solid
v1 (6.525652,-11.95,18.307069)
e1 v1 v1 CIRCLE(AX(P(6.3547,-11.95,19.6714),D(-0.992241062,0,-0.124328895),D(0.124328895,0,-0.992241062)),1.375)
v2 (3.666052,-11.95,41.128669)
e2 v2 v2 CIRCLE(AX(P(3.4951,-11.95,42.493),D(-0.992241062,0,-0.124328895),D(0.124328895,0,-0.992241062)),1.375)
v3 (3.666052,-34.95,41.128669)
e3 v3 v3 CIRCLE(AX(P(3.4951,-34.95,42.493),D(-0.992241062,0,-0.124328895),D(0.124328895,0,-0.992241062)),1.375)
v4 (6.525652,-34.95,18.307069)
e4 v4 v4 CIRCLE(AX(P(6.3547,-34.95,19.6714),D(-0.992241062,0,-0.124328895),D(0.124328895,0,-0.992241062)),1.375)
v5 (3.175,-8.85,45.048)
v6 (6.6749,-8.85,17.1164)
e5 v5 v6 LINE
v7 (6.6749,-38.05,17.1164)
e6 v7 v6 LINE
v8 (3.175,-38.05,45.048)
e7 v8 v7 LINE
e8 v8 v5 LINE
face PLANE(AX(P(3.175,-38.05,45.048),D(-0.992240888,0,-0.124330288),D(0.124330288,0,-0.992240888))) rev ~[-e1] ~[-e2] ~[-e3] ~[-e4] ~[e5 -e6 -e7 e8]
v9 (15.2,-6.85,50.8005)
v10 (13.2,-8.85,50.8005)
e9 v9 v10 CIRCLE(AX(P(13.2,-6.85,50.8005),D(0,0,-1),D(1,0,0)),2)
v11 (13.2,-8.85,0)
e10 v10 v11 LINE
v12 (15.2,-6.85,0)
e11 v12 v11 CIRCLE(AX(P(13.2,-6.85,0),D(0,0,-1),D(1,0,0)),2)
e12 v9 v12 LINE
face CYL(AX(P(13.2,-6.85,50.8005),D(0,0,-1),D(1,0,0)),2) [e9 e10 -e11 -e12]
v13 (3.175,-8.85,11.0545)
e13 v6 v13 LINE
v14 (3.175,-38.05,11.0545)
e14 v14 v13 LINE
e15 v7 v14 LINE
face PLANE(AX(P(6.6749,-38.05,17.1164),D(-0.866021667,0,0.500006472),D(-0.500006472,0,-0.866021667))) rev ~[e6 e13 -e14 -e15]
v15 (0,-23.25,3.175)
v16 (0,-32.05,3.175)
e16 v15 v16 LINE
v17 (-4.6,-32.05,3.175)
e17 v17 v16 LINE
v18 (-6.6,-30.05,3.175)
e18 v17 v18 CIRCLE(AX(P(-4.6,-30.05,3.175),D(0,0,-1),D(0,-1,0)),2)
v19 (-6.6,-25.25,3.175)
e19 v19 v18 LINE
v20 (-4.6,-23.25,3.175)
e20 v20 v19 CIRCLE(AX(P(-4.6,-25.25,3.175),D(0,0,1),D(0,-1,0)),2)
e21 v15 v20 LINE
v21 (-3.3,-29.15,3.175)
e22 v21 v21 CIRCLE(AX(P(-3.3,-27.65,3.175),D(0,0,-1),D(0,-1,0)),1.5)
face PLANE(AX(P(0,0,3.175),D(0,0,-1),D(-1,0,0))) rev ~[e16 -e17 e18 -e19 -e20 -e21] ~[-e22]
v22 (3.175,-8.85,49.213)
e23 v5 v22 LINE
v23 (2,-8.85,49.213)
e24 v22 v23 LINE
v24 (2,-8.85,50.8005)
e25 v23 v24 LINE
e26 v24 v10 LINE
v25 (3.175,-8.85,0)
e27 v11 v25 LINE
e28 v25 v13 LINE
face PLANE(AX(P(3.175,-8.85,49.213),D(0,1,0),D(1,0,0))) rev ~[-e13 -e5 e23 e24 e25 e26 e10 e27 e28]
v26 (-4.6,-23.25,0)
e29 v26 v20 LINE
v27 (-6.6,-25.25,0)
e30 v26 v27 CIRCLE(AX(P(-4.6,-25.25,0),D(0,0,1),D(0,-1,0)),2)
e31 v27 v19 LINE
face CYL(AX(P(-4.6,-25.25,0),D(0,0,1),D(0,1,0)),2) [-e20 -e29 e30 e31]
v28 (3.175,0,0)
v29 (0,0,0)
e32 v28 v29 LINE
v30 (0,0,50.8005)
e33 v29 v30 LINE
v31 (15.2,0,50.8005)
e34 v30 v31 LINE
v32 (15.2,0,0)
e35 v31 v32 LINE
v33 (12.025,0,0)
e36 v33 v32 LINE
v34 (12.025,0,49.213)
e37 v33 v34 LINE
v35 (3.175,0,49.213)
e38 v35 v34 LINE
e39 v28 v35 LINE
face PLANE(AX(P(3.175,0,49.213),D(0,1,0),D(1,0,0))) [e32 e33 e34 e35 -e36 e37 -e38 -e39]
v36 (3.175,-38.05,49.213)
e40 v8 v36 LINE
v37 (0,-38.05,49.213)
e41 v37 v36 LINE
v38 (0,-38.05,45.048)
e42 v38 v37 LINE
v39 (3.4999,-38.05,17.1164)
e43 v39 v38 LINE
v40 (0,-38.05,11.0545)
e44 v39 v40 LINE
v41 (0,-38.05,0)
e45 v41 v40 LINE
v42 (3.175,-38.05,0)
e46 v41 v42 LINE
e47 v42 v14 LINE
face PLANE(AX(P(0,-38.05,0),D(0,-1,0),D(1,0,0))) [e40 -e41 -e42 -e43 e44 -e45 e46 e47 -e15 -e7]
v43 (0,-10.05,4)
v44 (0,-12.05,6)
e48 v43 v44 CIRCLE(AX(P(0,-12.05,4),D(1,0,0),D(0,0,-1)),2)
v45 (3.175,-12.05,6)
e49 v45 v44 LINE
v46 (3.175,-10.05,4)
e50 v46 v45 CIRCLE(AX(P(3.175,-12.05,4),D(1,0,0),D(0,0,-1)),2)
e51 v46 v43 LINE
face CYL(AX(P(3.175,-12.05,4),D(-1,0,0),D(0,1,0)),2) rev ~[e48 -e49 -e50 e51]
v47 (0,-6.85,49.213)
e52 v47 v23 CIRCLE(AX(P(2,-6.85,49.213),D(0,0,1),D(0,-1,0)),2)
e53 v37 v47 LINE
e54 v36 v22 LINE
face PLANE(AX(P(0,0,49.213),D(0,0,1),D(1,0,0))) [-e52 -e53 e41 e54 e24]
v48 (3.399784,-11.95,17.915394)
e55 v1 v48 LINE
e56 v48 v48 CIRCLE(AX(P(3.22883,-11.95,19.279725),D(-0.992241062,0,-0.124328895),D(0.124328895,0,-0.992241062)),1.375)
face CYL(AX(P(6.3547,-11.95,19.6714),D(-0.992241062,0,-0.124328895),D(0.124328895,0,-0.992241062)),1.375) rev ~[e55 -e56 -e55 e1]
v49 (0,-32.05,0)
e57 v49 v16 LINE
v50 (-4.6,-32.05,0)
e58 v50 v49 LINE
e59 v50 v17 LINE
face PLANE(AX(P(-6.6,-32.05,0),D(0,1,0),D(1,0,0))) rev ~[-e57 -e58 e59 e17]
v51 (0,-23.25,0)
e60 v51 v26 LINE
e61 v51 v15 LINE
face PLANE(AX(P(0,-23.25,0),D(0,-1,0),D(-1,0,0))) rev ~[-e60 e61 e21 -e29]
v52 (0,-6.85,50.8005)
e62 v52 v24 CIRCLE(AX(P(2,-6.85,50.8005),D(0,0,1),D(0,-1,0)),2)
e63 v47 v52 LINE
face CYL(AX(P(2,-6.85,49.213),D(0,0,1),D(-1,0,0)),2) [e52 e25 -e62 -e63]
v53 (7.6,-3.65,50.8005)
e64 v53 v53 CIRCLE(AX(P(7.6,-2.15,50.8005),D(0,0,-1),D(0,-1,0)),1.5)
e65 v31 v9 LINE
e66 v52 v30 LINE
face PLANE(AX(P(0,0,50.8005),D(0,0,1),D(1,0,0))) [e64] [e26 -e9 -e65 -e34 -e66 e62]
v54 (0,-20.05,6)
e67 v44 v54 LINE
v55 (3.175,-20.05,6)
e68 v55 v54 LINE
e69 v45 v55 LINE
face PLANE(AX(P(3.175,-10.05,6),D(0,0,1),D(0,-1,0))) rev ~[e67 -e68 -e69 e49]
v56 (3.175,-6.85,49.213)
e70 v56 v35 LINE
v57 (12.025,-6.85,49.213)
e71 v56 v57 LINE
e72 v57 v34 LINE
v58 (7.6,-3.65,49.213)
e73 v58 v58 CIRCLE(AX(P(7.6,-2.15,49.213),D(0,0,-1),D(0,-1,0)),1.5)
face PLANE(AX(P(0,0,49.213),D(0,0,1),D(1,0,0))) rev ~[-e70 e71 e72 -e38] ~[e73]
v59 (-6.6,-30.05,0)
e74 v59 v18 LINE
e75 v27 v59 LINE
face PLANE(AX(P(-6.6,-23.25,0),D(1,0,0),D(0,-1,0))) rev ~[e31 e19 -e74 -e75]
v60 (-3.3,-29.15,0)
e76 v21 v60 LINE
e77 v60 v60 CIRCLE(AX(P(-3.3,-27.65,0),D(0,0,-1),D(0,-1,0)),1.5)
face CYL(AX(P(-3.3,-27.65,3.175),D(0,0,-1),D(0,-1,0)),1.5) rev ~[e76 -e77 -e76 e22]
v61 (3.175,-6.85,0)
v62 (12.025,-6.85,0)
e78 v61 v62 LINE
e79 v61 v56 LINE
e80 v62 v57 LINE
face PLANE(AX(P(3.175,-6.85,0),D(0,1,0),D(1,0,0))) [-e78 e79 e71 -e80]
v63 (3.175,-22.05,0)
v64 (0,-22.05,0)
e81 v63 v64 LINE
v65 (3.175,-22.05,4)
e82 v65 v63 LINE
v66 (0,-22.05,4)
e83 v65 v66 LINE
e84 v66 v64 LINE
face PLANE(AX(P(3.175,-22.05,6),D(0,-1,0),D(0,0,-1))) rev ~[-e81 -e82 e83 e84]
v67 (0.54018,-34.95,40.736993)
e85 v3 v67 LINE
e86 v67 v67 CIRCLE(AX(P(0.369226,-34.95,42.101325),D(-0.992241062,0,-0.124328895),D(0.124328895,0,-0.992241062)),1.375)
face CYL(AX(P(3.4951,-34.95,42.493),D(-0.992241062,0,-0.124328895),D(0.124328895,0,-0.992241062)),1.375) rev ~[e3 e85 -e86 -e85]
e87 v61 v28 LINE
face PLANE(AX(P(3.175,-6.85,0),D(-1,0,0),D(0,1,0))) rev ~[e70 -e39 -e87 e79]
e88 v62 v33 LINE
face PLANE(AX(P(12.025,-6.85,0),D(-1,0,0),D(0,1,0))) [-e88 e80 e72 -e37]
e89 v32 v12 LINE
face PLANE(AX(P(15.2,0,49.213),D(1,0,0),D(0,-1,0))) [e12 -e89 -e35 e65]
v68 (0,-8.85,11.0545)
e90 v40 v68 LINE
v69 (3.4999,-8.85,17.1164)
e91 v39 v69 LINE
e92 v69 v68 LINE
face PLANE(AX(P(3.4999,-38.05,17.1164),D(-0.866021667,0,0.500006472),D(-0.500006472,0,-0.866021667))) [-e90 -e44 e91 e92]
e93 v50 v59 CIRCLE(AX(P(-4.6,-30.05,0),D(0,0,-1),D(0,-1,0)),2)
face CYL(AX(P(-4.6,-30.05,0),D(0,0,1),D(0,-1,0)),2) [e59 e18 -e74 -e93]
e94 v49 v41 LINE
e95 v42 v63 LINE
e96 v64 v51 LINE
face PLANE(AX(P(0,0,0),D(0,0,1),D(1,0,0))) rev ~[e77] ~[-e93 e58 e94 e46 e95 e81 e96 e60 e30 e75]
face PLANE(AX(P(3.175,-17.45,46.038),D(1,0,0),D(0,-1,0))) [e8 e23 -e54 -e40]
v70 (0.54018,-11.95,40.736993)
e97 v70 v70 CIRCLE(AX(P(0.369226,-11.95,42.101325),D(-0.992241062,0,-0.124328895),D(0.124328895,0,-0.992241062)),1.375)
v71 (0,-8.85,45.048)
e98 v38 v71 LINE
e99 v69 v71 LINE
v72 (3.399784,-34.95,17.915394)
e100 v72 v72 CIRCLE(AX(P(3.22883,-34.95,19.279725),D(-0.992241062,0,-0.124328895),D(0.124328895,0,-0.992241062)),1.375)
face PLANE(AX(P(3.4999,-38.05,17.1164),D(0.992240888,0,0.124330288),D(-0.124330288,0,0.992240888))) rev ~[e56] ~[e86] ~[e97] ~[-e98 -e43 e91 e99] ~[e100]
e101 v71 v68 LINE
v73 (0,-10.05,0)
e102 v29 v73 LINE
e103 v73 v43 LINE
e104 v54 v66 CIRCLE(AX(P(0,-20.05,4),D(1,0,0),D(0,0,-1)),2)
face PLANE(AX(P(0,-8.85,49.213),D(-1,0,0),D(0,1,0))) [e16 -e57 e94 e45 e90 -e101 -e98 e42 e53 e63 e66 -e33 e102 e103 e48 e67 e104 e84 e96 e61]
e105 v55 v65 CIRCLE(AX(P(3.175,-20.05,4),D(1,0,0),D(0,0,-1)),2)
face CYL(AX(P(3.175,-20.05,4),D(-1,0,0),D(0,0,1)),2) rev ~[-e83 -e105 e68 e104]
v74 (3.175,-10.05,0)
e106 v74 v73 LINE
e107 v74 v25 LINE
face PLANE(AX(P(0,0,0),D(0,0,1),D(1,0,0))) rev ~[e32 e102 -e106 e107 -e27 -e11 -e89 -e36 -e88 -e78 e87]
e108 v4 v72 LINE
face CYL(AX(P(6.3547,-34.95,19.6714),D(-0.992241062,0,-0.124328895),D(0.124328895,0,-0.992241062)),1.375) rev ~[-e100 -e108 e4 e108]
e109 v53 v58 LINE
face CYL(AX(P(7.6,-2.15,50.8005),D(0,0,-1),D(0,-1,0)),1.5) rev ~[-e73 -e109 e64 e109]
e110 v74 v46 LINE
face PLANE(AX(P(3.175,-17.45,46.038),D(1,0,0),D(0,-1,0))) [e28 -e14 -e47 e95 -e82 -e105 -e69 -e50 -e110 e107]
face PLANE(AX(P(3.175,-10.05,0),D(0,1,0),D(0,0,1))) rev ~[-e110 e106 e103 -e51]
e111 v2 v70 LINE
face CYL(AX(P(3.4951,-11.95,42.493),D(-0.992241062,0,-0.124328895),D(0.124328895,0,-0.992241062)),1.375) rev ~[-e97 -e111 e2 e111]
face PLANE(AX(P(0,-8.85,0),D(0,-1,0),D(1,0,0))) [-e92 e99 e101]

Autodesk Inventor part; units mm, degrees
ref_plane "YZ Plane" through (0, 0, 0) normal (1, 0, 0) x (0, 1, 0)
ref_plane "XZ Plane" through (0, 0, 0) normal (0, 1, 0) x (-1, 0, 0)
ref_plane "XY Plane" through (0, 0, 0) normal (0, 0, 1) x (1, 0, 0)
sketch "Sketch1" plane through (0, 0, 0) normal (0, 0, 1) x (1, 0, 0)
  line L0 (0, 0) -> (0, -38.05)
  line L1 (0, -38.05) -> (3.175, -38.05)
  line L2 (3.175, -38.05) -> (3.175, 0)
  line L3 (3.175, 0) -> (0, 0)
  line L4 (3.175, 0) -> (3.175, -6.85)
  line L5 (3.175, -6.85) -> (12.025, -6.85)
  line L6 (12.025, -6.85) -> (12.025, 0)
  line L7 (12.025, 0) -> (15.2, 0)
  line L8 (15.2, 0) -> (15.2, -6.85)
  line L9 (15.2, -6.85) -> (15.2, -8.85)
  line L10 (15.2, -8.85) -> (3.175, -8.85)
  line L11 (0, -38.05) -> (0, -31.2)
  dimension "d0" = 38.05
  dimension "d1" = 3.175
  dimension "d2" = 6.85
  dimension "d3" = 8.85
  dimension "d4" = 3.175
  dimension "d5" = 2
extrude "Extrusion1" add sketch "Sketch1" along normal blind 49.213
sketch "Sketch2" plane through (0, 0, 0) normal (0, 0, -1) x (-1, 0, 0)
  line L0 (0, -38.05) -> (-3.175, -38.05) projected
  line L1 (0, -38.05) -> (0, -32.05)
  line L2 (0, 0) -> (0, -38.05) projected
  line L3 (0, -32.05) -> (0, -23.25)
  line L4 (0, -23.25) -> (6.6, -23.25)
  line L5 (6.6, -23.25) -> (6.6, -32.05)
  line L6 (6.6, -32.05) -> (0, -32.05)
  dimension "d12" = 6
  dimension "d13" = 8.8
  dimension "d14" = 6.6
extrude "Extrusion2" add sketch "Sketch2" against normal blind 3.175
sketch "Sketch3" plane through (0, 0, 3.175) normal (0, 0, 1) x (1, 0, 0)
  line L0 (0, -23.25) -> (0, -32.05) projected
  line L1 (0, -23.25) -> (-3.3, -23.25)
  line L2 (0, -23.25) -> (-6.6, -23.25) projected
  line L3 (-3.3, -23.25) -> (-3.3, -27.65)
  point P0 (0, 0)
  dimension "d17" = 4.4
hole "Hole1" at (-3.3, -27.65, 3.175) direction (0, 0, -1) diameter 3 end through all
fillet "Fillet1" radius 2 2 edges at (-6.6, -23.25, 1.5875) (-6.6, -32.05, 1.5875)
sketch "Sketch4" plane through (0, 0, 49.213) normal (0, 0, 1) x (1, 0, 0)
  line L0 (3.175, 0) -> (0, 0) projected
  line L1 (3.175, -8.85) -> (15.2, -8.85) projected
  line L2 (0, 0) -> (15.2, 0)
  line L3 (15.2, 0) -> (15.2, -8.85)
  line L4 (15.2, -8.85) -> (0, -8.85)
  line L5 (0, -8.85) -> (0, 0)
extrude "Extrusion3" add sketch "Sketch4" along normal blind 1.5875
sketch "Sketch5" plane through (0, 0, 50.8005) normal (0, 0, 1) x (1, 0, 0)
  line L0 (3.175, 0) -> (0, 0) projected
  line L1 (0, 0) -> (3.175, 0)
  line L2 (3.175, 0) -> (12.025, 0) projected
  line L3 (3.175, 0) -> (7.6, 0)
  line L4 (7.6, 0) -> (7.6, -3.425)
  dimension "d28" = 3.425
hole "Hole2" at (7.6, -3.425, 50.8005) direction (0, 0, -1) diameter 3 end through all
fillet "Fillet2" radius 2 2 edges at (0, -8.85, 50.0068) (15.2, -8.85, 25.4003)
sketch "Sketch6" plane through (0, -38.05, 0) normal (-1, 0, 0) x (0, 0, 1)
  line L0 (0, 0) -> (0, 29.2) projected
  line L1 (0, 0) -> (0, 28.2)
  line L2 (0, 28.2) -> (28.2, 28.2)
  line L3 (28.2, 28.2) -> (28.2, 0)
  line L4 (0, 0) -> (49.213, 0) projected
  line L5 (0, 0) -> (0, 14.1)
  line L6 (0, 12.8) -> (0, 14.8) projected
  line L7 (0, 14.1) -> (14.1, 14.1)
  line L8 (14.1, 14.1) -> (2.6, 14.1)
  line L9 (2.6, 14.1) -> (2.6, 2.6)
  line L10 (0, 12.8) -> (3.175, 12.8) projected
  line L11 (2.6, 2.6) -> (25.6, 2.6)
  line L12 (25.6, 2.6) -> (25.6, 25.6)
  line L13 (25.6, 25.6) -> (2.6, 25.6)
  line L14 (2.6, 25.6) -> (2.6, 2.6)
  point P0 (0, 38.05)
  dimension "d37" = 28.2
  dimension "d38" = 28.2
  dimension "d39" = 11.5
  dimension "d40" = 11.5
  dimension "d41" = 90
  dimension "d42" = 23
  dimension "d43" = 23
hole "Hole3" at (0, -35.45, 2.6) at (0, -35.45, 25.6) at (0, -12.45, 25.6) at (0, -12.45, 2.6) direction (1, 0, 0) diameter 2.5 end through all
delete faces "Delete1" heal yes whole lump no faces at (7.7207, -4.9201, 50.2713)
sketch "Sketch7" plane through (0, 0, 50.8005) normal (0, 0, 1) x (1, 0, 0)
  line L0 (15.2, -6.85) -> (15.2, 0) projected
  line L1 (15.2, 0) -> (0, 0) projected
  line L2 (15.2, 0) -> (0, 0)
  line L3 (0, 0) -> (7.6, 0)
  line L4 (7.6, 0) -> (7.6, -2.15)
  dimension "d51" = 2.15
hole "Hole4" at (7.6, -2.15, 50.8005) direction (0, 0, -1) diameter 3 depth 3.5
sketch "Sketch8" plane through (0, 0, 49.213) normal (0, 0, 1) x (1, 0, 0)
  line L0 (0, -38.05) -> (3.175, -38.05) projected
  line L1 (3.175, -38.05) -> (0, -38.05)
  line L2 (3.175, -23.45) -> (0, -23.45)
  line L3 (0, -23.45) -> (0, -17.45)
  line L4 (0, -17.45) -> (3.175, -17.45)
  line L5 (3.175, -17.45) -> (3.175, -23.45)
  line L6 (3.175, -23.45) -> (0, -23.45)
  line L7 (0, -23.45) -> (0, -29.45)
  line L8 (0, -29.45) -> (3.175, -29.45)
  line L9 (3.175, -29.45) -> (3.175, -23.45)
  point P0 (0, 0)
  point P1 (3.175, -8.85)
  dimension "d59" = 6
  dimension "d60" = 6
extrude "Extrusion4" cut sketch "Sketch8" against normal blind 3.175
fillet "Fillet3" radius 2 2 edges at (1.5875, -17.45, 46.038) (1.5875, -29.45, 46.038)
sketch "Sketch9" plane through (0, 0, 46.038) normal (0, 0, 1) x (1, 0, 0)
  line L0 (3.175, -17.45) -> (0, -17.45) projected
  line L1 (0, -29.45) -> (3.175, -29.45) projected
  line L2 (0, -17.45) -> (3.175, -17.45)
  line L3 (3.175, -17.45) -> (3.175, -29.45)
  line L4 (3.175, -29.45) -> (0, -29.45)
  line L5 (0, -29.45) -> (0, -17.45)
  point P0 (0, 0)
extrude "Extrusion5" add sketch "Sketch9" along normal blind 3.175
delete faces "Delete Face1" heal yes whole lump no faces at (1.0583, -12.3494, 3.8459) (1.0583, -12.3494, 26.8459) (1.0583, -35.3494, 26.8459) (1.0583, -35.3494, 3.8459)
sketch "Sketch10" plane through (0, -38.05, 0) normal (0, -1, 0) x (1, 0, 0)
  line L0 (3.175, 0) -> (3.175, 49.213) projected
  line L1 (3.175, 49.213) -> (3.175, 45.048)
  line L2 (3.175, 45.048) -> (6.6749, 17.1164)
  line L3 (6.6749, 17.1164) -> (3.175, 16.6779)
  line L4 (3.175, 16.6779) -> (3.175, 45.048)
  point P0 (0, 0)
  dimension "d66" = 4.165
  dimension "d67" = 28.15
  dimension "d68" = 172.858
extrude "Extrusion6" add sketch "Sketch10" against normal up to next
sketch "Sketch11" plane through (3.175, -38.05, 45.048) normal (0.9922411, 0, 0.1243289) x (0.1243289, 0, -0.9922411)
  line L0 (44.6985, 29.2) -> (28.15, 29.2) projected
  line L1 (0, 0) -> (28.15, 29.2)
  line L2 (0, 0) -> (0, 29.2) projected
  line L3 (28.15, 0) -> (28.15, 29.2) projected
  line L4 (0, 29.2) -> (28.15, 0)
  line L5 (14.075, 14.6) -> (2.575, 14.6)
  line L6 (2.575, 14.6) -> (2.575, 26.1)
  line L7 (2.575, 26.1) -> (14.075, 26.1)
  line L8 (14.075, 26.1) -> (14.075, 14.6)
  line L9 (14.075, 14.6) -> (2.575, 14.6)
  line L10 (2.575, 14.6) -> (2.575, 3.1)
  line L11 (2.575, 3.1) -> (14.075, 3.1)
  line L12 (14.075, 3.1) -> (14.075, 14.6)
  line L13 (14.075, 14.6) -> (25.575, 14.6)
  line L14 (25.575, 14.6) -> (25.575, 3.1)
  line L15 (25.575, 3.1) -> (14.075, 3.1)
  line L16 (14.075, 3.1) -> (14.075, 14.6)
  line L17 (14.075, 14.6) -> (25.575, 14.6)
  line L18 (25.575, 14.6) -> (25.575, 26.1)
  line L19 (25.575, 26.1) -> (14.075, 26.1)
  line L20 (14.075, 26.1) -> (14.075, 14.6)
  point P0 (44.3037, 38.05)
  dimension "d71" = 11.5
  dimension "d72" = 11.5
  dimension "d73" = 11.5
  dimension "d74" = 11.5
  dimension "d75" = 11.5
  dimension "d76" = 11.5
  dimension "d77" = 11.5
  dimension "d78" = 11.5
hole "Hole5" at (3.4951, -34.95, 42.493) at (3.4951, -11.95, 42.493) at (6.3547, -11.95, 19.6714) at (6.3547, -34.95, 19.6714) direction (-0.9922411, 0, -0.1243289) diameter 2.75 end through all
sketch "Sketch12" plane through (0, -38.05, 0) normal (0, -1, 0) x (1, 0, 0)
  line L0 (3.175, 45.048) -> (6.6749, 17.1164) projected
  line L1 (6.6749, 17.1164) -> (3.175, 11.0545)
  line L2 (3.175, 49.213) -> (3.175, 0) projected
  line L3 (6.6749, 17.1164) -> (13.6746, 17.1164) construction
  line L4 (3.175, 11.0545) -> (3.175, 16.6739)
  line L5 (6.6749, 17.1164) -> (3.175, 16.6779) projected
  line L6 (6.6749, 17.1164) -> (3.175, 16.6779)
  point P0 (0, 0)
  dimension "d86" = 120
extrude "Extrusion7" add sketch "Sketch12" against normal up to next contours L1 L2 L5
sketch "Sketch13" plane through (0, -38.05, 0) normal (0, -1, 0) x (1, 0, 0)
  line L0 (3.175, 45.048) -> (6.6749, 17.1164) projected
  line L1 (3.175, 45.048) -> (0, 45.048)
  line L2 (0, 0) -> (0, 50.8005) projected
  line L3 (6.6749, 17.1164) -> (0, 17.1164)
  line L4 (6.6749, 17.1164) -> (3.4999, 17.1164)
  line L5 (3.4999, 17.1164) -> (0, 45.048)
  line L6 (3.4999, 17.1164) -> (0, 11.0545)
  line L7 (3.4999, 17.1164) -> (10.4996, 17.1164) construction
  line L8 (0, 11.0545) -> (0, 45.048)
  dimension "d89" = 3.175
  dimension "d90" = 120
extrude "Extrusion8" cut sketch "Sketch13" against normal up to surface (29.2 mm away) contours L5 L3 L2 | L6 L2 L3
sketch "Sketch14" plane through (3.175, -38.05, 0) normal (1, 0, 0) x (0, 0, -1)
  point P0 (0, 38.05)
sketch "Sketch15" plane through (3.175, -38.05, 0) normal (1, 0, 0) x (0, 0, -1)
  line L0 (0, 29.2) -> (-11.0545, 29.2) projected
  line L1 (0, 14.8) -> (-3.175, 14.8) projected
  line L2 (0, 29.2) -> (0, 14.8)
  line L3 (0, 14.8) -> (0, 22)
  line L4 (0, 0) -> (0, 29.2) projected
  line L5 (0, 22) -> (0, 28)
  line L6 (0, 28) -> (-6, 28)
  line L7 (-6, 28) -> (-6, 16)
  line L8 (-6, 16) -> (0, 16)
  line L9 (0, 16) -> (0, 28)
  point P0 (0, 38.05)
  dimension "d93" = 7.2
  dimension "d94" = 6
  dimension "d95" = 6
  dimension "d96" = 12
extrude "Extrusion9" cut sketch "Sketch15" against normal up to next
fillet "Fillet4" radius 2 2 edges at (1.5875, -22.05, 6) (1.5875, -10.05, 6)
properties part number "Yaw Motor Mount_v2"
